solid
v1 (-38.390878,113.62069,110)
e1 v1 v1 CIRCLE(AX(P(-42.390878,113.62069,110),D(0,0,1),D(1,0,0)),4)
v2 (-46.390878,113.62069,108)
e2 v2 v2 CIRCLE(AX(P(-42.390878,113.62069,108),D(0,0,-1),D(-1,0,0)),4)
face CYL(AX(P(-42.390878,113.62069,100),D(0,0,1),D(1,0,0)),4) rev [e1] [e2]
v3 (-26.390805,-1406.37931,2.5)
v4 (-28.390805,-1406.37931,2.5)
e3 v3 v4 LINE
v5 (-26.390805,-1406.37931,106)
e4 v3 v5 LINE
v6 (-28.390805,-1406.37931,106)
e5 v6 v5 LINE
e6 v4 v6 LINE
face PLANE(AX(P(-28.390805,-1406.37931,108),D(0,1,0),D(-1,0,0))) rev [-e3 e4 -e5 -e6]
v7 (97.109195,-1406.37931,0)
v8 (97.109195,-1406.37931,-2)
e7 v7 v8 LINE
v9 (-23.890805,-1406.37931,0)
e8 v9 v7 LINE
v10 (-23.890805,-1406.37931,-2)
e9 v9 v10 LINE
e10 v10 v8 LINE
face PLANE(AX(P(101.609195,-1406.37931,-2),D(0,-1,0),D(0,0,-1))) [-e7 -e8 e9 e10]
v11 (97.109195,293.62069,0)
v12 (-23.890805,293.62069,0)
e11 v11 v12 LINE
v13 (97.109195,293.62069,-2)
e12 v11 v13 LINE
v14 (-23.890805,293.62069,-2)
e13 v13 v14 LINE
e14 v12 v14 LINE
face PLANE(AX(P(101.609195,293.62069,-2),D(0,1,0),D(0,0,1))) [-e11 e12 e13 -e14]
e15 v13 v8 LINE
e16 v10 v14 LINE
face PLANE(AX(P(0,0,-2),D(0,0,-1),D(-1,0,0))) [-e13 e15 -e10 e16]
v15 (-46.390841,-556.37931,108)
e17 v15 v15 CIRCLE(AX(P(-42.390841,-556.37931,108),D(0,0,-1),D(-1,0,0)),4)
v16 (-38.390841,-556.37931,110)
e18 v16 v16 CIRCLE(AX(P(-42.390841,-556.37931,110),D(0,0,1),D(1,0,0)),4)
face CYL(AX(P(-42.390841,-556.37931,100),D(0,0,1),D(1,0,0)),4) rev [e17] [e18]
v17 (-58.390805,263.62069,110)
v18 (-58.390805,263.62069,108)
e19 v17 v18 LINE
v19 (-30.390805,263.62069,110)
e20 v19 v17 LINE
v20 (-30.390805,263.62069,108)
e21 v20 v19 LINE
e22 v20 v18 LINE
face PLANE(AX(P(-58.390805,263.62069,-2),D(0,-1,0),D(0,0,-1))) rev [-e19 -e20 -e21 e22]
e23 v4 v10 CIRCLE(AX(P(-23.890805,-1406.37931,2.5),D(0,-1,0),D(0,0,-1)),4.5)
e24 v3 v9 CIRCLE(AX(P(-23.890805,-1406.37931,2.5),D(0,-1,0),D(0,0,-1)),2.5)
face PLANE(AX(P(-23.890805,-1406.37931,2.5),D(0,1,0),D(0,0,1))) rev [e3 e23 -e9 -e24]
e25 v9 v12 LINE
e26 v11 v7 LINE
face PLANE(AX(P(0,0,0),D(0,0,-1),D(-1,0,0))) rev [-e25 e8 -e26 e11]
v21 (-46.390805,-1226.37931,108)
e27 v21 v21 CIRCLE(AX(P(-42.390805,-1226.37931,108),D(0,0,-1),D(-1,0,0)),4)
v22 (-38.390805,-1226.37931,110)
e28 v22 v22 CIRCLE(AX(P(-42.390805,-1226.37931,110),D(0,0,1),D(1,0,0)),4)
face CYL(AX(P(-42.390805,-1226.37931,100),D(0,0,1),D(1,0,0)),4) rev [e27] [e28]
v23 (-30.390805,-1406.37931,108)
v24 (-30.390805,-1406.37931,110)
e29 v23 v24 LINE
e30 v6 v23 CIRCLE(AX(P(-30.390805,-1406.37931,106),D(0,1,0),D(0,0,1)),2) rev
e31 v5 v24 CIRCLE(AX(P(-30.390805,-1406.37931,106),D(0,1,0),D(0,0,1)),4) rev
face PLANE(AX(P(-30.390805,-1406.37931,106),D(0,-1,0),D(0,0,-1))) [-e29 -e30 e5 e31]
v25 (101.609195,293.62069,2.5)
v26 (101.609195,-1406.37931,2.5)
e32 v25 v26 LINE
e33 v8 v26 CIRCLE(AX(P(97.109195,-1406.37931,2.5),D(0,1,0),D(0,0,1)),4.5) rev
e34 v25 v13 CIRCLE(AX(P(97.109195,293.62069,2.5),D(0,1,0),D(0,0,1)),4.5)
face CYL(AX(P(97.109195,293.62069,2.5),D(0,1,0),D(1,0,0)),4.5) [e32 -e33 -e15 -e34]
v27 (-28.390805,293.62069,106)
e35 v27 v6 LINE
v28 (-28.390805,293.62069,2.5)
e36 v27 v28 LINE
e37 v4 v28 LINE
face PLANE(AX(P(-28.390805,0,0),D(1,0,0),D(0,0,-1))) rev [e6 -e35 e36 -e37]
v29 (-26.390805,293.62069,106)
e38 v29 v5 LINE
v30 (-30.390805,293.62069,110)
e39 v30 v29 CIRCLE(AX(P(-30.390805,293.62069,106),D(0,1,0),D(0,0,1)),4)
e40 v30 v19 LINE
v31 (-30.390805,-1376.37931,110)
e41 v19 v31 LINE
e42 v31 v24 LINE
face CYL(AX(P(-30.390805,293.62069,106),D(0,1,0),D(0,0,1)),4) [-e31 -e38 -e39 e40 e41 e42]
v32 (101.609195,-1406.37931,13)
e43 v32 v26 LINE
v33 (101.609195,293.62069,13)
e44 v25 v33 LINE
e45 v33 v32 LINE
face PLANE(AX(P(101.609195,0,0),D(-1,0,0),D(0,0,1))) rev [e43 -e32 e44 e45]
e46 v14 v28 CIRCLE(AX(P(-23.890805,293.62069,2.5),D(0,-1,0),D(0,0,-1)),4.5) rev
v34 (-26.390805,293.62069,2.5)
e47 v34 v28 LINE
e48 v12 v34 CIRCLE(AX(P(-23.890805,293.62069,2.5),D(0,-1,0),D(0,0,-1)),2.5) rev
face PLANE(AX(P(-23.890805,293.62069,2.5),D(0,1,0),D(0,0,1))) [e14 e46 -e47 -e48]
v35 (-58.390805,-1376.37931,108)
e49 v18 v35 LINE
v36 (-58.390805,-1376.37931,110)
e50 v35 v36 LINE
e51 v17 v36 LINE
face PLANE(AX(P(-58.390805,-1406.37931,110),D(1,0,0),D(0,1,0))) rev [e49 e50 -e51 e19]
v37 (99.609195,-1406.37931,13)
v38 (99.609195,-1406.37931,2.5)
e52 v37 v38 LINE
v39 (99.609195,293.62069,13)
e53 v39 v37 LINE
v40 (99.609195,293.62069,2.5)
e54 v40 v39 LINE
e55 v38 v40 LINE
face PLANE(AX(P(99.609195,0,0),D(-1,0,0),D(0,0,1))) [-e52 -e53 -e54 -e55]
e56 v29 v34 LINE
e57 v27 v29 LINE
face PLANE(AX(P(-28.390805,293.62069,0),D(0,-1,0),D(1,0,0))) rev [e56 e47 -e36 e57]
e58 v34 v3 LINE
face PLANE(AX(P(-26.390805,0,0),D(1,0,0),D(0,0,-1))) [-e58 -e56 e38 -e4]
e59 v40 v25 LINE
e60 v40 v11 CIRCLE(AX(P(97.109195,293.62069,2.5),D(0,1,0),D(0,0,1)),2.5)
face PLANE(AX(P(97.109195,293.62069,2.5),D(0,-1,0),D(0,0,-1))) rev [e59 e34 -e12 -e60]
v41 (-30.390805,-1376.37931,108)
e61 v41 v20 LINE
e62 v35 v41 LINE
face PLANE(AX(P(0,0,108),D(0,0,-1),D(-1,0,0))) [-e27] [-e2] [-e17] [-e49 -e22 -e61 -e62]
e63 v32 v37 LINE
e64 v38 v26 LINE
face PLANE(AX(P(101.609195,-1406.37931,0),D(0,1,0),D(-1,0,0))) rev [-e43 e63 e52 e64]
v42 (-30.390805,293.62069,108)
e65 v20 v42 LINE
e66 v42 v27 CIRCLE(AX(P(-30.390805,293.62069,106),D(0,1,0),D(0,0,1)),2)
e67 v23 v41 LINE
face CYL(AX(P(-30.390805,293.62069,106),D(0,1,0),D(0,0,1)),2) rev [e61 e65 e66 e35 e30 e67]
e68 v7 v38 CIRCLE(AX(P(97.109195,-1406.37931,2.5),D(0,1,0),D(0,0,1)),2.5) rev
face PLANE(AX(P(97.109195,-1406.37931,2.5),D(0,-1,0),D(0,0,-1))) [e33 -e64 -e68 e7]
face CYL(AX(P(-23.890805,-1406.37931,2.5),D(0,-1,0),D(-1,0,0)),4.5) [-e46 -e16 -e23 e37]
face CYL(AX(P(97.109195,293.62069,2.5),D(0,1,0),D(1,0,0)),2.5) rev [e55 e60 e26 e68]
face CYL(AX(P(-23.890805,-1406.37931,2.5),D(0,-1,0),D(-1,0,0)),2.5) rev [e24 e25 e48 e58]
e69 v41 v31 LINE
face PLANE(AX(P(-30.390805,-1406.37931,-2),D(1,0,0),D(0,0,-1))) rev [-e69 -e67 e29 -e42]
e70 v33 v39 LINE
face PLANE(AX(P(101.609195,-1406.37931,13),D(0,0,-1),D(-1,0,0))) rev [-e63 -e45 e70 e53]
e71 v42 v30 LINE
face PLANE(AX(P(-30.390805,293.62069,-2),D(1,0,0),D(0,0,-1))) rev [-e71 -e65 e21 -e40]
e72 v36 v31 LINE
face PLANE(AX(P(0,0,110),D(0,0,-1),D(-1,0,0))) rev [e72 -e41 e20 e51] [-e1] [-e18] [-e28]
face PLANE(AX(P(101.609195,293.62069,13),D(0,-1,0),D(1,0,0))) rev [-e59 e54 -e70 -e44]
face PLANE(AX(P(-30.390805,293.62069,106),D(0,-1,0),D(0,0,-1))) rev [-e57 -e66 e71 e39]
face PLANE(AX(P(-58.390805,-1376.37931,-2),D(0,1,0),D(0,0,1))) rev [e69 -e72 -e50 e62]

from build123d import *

# Parameters (mm, degrees)
SKETCH1_W                    = 130
SKETCH1_H                    = 1700
BASE_FLANGE1_DEPTH           = 2
EDGE_FLANGE1_STRIP_W         = 13
EDGE_FLANGE1_STRIP_H         = 2
EDGE_FLANGE1_STRIP_CUT_DEPTH = 1700
EDGE_FLANGE1_DEPTH           = 1700
EDGE_FLANGE2_STRIP_W         = 13
EDGE_FLANGE2_STRIP_H         = 2
EDGE_FLANGE2_STRIP_CUT_DEPTH = 1700
EDGE_FLANGE2_DEPTH           = 1700
EDGE_FLANGE3_STRIP_W         = 12
EDGE_FLANGE3_STRIP_H         = 2
EDGE_FLANGE3_STRIP_CUT_DEPTH = 1700
EDGE_FLANGE3_DEPTH           = 1700
CUT_EXTRUDE1_DEPTH           = 1415.486194049
CUT_EXTRUDE1_DEPTH_BACK      = 1415.486194049
SKETCH15_W                   = 28
SKETCH15_H                   = 30
SKETCH16_R                   = 4
CUT_EXTRUDE2_DEPTH           = 10


# Sheet-metal steps are written as plain solids
with BuildPart() as part:
    # Sketch1 → Base-Flange1 (new body)
    with BuildSketch(Plane.XY):
        with Locations((36.609195402, -556.379310345)):
            Rectangle(SKETCH1_W, SKETCH1_H)
    extrude(amount=-BASE_FLANGE1_DEPTH)

    # Edge-Flange1 strip (across the edge) → Edge-Flange1 strip cut (cut)
    with BuildSketch(Plane(origin=(101.609195402, -1406.379310345, 0), x_dir=(-1, 0, 0), z_dir=(0, 1, 0))):
        with Locations((-2, -1)):
            Rectangle(EDGE_FLANGE1_STRIP_W, EDGE_FLANGE1_STRIP_H)
    extrude(amount=EDGE_FLANGE1_STRIP_CUT_DEPTH, mode=Mode.SUBTRACT)

    # Edge-Flange1 section (across the edge) → Edge-Flange1 (add)
    with BuildSketch(Plane(origin=(101.609195402, -1406.379310345, 0), x_dir=(-1, 0, 0), z_dir=(0, 1, 0))):
        with BuildLine():
            Line((0, 2.5), (0, 13))
            Line((0, 13), (2, 13))
            Line((2, 13), (2, 2.5))
            ThreePointArc((2, 2.5), (2.732233047, 0.732233047), (4.5, 0))
            Line((4.5, 0), (4.5, -2))
            ThreePointArc((4.5, -2), (1.318019485, -0.681980515), (0, 2.5))
        make_face()
    extrude(amount=EDGE_FLANGE1_DEPTH)

    # Edge-Flange2 strip (across the edge) → Edge-Flange2 strip cut (cut)
    with BuildSketch(Plane(origin=(-28.390804598, 293.620689655, 0), x_dir=(1, 0, 0), z_dir=(0, -1, 0))):
        with Locations((-2, -1)):
            Rectangle(EDGE_FLANGE2_STRIP_W, EDGE_FLANGE2_STRIP_H)
    extrude(amount=EDGE_FLANGE2_STRIP_CUT_DEPTH, mode=Mode.SUBTRACT)

    # Edge-Flange2 section (across the edge) → Edge-Flange2 (add)
    with BuildSketch(Plane(origin=(-28.390804598, 293.620689655, 0), x_dir=(1, 0, 0), z_dir=(0, -1, 0))):
        with BuildLine():
            Line((0, 2.5), (0, 108))
            Line((0, 108), (2, 108))
            Line((2, 108), (2, 2.5))
            ThreePointArc((2, 2.5), (2.732233047, 0.732233047), (4.5, 0))
            Line((4.5, 0), (4.5, -2))
            ThreePointArc((4.5, -2), (1.318019485, -0.681980515), (0, 2.5))
        make_face()
    extrude(amount=EDGE_FLANGE2_DEPTH)

    # Edge-Flange3 strip (across the edge) → Edge-Flange3 strip cut (cut)
    with BuildSketch(Plane(origin=(-28.390804598, -1406.379310345, 108), x_dir=(0, 0, -1), z_dir=(0, 1, 0))):
        with Locations((-4, -1)):
            Rectangle(EDGE_FLANGE3_STRIP_W, EDGE_FLANGE3_STRIP_H)
    extrude(amount=EDGE_FLANGE3_STRIP_CUT_DEPTH, mode=Mode.SUBTRACT)

    # Edge-Flange3 section (across the edge) → Edge-Flange3 (add)
    with BuildSketch(Plane(origin=(-28.390804598, -1406.379310345, 108), x_dir=(0, 0, -1), z_dir=(0, 1, 0))):
        with BuildLine():
            Line((-2, 2), (-2, 30))
            Line((-2, 30), (0, 30))
            Line((0, 30), (0, 2))
            ThreePointArc((0, 2), (0.585786438, 0.585786438), (2, 0))
            Line((2, 0), (2, -2))
            ThreePointArc((2, -2), (-0.828427125, -0.828427125), (-2, 2))
        make_face()
    extrude(amount=EDGE_FLANGE3_DEPTH)

    # Sketch15 → Cut-Extrude1 (cut, two sides: drawn at the far end of the back side and taken through both)
    with BuildSketch(Plane.XY.offset(110).offset(-CUT_EXTRUDE1_DEPTH_BACK)):
        with Locations((-44.390804598, -1391.379310345)):
            Rectangle(SKETCH15_W, SKETCH15_H)
        with Locations((-44.390804598, 278.620689655)):
            Rectangle(SKETCH15_W, SKETCH15_H)
    extrude(amount=CUT_EXTRUDE1_DEPTH + CUT_EXTRUDE1_DEPTH_BACK, mode=Mode.SUBTRACT)

    # Sketch16 → Cut-Extrude2 (cut)
    with BuildSketch(Plane.XY.offset(110)):
        with Locations((-42.390804598, -1226.379310345)):
            Circle(SKETCH16_R)
        with Locations((-42.390841166, -556.379310345)):
            Circle(SKETCH16_R)
        with Locations((-42.390877735, 113.620689655)):
            Circle(SKETCH16_R)
    extrude(amount=-CUT_EXTRUDE2_DEPTH, mode=Mode.SUBTRACT)


solid = part.part
